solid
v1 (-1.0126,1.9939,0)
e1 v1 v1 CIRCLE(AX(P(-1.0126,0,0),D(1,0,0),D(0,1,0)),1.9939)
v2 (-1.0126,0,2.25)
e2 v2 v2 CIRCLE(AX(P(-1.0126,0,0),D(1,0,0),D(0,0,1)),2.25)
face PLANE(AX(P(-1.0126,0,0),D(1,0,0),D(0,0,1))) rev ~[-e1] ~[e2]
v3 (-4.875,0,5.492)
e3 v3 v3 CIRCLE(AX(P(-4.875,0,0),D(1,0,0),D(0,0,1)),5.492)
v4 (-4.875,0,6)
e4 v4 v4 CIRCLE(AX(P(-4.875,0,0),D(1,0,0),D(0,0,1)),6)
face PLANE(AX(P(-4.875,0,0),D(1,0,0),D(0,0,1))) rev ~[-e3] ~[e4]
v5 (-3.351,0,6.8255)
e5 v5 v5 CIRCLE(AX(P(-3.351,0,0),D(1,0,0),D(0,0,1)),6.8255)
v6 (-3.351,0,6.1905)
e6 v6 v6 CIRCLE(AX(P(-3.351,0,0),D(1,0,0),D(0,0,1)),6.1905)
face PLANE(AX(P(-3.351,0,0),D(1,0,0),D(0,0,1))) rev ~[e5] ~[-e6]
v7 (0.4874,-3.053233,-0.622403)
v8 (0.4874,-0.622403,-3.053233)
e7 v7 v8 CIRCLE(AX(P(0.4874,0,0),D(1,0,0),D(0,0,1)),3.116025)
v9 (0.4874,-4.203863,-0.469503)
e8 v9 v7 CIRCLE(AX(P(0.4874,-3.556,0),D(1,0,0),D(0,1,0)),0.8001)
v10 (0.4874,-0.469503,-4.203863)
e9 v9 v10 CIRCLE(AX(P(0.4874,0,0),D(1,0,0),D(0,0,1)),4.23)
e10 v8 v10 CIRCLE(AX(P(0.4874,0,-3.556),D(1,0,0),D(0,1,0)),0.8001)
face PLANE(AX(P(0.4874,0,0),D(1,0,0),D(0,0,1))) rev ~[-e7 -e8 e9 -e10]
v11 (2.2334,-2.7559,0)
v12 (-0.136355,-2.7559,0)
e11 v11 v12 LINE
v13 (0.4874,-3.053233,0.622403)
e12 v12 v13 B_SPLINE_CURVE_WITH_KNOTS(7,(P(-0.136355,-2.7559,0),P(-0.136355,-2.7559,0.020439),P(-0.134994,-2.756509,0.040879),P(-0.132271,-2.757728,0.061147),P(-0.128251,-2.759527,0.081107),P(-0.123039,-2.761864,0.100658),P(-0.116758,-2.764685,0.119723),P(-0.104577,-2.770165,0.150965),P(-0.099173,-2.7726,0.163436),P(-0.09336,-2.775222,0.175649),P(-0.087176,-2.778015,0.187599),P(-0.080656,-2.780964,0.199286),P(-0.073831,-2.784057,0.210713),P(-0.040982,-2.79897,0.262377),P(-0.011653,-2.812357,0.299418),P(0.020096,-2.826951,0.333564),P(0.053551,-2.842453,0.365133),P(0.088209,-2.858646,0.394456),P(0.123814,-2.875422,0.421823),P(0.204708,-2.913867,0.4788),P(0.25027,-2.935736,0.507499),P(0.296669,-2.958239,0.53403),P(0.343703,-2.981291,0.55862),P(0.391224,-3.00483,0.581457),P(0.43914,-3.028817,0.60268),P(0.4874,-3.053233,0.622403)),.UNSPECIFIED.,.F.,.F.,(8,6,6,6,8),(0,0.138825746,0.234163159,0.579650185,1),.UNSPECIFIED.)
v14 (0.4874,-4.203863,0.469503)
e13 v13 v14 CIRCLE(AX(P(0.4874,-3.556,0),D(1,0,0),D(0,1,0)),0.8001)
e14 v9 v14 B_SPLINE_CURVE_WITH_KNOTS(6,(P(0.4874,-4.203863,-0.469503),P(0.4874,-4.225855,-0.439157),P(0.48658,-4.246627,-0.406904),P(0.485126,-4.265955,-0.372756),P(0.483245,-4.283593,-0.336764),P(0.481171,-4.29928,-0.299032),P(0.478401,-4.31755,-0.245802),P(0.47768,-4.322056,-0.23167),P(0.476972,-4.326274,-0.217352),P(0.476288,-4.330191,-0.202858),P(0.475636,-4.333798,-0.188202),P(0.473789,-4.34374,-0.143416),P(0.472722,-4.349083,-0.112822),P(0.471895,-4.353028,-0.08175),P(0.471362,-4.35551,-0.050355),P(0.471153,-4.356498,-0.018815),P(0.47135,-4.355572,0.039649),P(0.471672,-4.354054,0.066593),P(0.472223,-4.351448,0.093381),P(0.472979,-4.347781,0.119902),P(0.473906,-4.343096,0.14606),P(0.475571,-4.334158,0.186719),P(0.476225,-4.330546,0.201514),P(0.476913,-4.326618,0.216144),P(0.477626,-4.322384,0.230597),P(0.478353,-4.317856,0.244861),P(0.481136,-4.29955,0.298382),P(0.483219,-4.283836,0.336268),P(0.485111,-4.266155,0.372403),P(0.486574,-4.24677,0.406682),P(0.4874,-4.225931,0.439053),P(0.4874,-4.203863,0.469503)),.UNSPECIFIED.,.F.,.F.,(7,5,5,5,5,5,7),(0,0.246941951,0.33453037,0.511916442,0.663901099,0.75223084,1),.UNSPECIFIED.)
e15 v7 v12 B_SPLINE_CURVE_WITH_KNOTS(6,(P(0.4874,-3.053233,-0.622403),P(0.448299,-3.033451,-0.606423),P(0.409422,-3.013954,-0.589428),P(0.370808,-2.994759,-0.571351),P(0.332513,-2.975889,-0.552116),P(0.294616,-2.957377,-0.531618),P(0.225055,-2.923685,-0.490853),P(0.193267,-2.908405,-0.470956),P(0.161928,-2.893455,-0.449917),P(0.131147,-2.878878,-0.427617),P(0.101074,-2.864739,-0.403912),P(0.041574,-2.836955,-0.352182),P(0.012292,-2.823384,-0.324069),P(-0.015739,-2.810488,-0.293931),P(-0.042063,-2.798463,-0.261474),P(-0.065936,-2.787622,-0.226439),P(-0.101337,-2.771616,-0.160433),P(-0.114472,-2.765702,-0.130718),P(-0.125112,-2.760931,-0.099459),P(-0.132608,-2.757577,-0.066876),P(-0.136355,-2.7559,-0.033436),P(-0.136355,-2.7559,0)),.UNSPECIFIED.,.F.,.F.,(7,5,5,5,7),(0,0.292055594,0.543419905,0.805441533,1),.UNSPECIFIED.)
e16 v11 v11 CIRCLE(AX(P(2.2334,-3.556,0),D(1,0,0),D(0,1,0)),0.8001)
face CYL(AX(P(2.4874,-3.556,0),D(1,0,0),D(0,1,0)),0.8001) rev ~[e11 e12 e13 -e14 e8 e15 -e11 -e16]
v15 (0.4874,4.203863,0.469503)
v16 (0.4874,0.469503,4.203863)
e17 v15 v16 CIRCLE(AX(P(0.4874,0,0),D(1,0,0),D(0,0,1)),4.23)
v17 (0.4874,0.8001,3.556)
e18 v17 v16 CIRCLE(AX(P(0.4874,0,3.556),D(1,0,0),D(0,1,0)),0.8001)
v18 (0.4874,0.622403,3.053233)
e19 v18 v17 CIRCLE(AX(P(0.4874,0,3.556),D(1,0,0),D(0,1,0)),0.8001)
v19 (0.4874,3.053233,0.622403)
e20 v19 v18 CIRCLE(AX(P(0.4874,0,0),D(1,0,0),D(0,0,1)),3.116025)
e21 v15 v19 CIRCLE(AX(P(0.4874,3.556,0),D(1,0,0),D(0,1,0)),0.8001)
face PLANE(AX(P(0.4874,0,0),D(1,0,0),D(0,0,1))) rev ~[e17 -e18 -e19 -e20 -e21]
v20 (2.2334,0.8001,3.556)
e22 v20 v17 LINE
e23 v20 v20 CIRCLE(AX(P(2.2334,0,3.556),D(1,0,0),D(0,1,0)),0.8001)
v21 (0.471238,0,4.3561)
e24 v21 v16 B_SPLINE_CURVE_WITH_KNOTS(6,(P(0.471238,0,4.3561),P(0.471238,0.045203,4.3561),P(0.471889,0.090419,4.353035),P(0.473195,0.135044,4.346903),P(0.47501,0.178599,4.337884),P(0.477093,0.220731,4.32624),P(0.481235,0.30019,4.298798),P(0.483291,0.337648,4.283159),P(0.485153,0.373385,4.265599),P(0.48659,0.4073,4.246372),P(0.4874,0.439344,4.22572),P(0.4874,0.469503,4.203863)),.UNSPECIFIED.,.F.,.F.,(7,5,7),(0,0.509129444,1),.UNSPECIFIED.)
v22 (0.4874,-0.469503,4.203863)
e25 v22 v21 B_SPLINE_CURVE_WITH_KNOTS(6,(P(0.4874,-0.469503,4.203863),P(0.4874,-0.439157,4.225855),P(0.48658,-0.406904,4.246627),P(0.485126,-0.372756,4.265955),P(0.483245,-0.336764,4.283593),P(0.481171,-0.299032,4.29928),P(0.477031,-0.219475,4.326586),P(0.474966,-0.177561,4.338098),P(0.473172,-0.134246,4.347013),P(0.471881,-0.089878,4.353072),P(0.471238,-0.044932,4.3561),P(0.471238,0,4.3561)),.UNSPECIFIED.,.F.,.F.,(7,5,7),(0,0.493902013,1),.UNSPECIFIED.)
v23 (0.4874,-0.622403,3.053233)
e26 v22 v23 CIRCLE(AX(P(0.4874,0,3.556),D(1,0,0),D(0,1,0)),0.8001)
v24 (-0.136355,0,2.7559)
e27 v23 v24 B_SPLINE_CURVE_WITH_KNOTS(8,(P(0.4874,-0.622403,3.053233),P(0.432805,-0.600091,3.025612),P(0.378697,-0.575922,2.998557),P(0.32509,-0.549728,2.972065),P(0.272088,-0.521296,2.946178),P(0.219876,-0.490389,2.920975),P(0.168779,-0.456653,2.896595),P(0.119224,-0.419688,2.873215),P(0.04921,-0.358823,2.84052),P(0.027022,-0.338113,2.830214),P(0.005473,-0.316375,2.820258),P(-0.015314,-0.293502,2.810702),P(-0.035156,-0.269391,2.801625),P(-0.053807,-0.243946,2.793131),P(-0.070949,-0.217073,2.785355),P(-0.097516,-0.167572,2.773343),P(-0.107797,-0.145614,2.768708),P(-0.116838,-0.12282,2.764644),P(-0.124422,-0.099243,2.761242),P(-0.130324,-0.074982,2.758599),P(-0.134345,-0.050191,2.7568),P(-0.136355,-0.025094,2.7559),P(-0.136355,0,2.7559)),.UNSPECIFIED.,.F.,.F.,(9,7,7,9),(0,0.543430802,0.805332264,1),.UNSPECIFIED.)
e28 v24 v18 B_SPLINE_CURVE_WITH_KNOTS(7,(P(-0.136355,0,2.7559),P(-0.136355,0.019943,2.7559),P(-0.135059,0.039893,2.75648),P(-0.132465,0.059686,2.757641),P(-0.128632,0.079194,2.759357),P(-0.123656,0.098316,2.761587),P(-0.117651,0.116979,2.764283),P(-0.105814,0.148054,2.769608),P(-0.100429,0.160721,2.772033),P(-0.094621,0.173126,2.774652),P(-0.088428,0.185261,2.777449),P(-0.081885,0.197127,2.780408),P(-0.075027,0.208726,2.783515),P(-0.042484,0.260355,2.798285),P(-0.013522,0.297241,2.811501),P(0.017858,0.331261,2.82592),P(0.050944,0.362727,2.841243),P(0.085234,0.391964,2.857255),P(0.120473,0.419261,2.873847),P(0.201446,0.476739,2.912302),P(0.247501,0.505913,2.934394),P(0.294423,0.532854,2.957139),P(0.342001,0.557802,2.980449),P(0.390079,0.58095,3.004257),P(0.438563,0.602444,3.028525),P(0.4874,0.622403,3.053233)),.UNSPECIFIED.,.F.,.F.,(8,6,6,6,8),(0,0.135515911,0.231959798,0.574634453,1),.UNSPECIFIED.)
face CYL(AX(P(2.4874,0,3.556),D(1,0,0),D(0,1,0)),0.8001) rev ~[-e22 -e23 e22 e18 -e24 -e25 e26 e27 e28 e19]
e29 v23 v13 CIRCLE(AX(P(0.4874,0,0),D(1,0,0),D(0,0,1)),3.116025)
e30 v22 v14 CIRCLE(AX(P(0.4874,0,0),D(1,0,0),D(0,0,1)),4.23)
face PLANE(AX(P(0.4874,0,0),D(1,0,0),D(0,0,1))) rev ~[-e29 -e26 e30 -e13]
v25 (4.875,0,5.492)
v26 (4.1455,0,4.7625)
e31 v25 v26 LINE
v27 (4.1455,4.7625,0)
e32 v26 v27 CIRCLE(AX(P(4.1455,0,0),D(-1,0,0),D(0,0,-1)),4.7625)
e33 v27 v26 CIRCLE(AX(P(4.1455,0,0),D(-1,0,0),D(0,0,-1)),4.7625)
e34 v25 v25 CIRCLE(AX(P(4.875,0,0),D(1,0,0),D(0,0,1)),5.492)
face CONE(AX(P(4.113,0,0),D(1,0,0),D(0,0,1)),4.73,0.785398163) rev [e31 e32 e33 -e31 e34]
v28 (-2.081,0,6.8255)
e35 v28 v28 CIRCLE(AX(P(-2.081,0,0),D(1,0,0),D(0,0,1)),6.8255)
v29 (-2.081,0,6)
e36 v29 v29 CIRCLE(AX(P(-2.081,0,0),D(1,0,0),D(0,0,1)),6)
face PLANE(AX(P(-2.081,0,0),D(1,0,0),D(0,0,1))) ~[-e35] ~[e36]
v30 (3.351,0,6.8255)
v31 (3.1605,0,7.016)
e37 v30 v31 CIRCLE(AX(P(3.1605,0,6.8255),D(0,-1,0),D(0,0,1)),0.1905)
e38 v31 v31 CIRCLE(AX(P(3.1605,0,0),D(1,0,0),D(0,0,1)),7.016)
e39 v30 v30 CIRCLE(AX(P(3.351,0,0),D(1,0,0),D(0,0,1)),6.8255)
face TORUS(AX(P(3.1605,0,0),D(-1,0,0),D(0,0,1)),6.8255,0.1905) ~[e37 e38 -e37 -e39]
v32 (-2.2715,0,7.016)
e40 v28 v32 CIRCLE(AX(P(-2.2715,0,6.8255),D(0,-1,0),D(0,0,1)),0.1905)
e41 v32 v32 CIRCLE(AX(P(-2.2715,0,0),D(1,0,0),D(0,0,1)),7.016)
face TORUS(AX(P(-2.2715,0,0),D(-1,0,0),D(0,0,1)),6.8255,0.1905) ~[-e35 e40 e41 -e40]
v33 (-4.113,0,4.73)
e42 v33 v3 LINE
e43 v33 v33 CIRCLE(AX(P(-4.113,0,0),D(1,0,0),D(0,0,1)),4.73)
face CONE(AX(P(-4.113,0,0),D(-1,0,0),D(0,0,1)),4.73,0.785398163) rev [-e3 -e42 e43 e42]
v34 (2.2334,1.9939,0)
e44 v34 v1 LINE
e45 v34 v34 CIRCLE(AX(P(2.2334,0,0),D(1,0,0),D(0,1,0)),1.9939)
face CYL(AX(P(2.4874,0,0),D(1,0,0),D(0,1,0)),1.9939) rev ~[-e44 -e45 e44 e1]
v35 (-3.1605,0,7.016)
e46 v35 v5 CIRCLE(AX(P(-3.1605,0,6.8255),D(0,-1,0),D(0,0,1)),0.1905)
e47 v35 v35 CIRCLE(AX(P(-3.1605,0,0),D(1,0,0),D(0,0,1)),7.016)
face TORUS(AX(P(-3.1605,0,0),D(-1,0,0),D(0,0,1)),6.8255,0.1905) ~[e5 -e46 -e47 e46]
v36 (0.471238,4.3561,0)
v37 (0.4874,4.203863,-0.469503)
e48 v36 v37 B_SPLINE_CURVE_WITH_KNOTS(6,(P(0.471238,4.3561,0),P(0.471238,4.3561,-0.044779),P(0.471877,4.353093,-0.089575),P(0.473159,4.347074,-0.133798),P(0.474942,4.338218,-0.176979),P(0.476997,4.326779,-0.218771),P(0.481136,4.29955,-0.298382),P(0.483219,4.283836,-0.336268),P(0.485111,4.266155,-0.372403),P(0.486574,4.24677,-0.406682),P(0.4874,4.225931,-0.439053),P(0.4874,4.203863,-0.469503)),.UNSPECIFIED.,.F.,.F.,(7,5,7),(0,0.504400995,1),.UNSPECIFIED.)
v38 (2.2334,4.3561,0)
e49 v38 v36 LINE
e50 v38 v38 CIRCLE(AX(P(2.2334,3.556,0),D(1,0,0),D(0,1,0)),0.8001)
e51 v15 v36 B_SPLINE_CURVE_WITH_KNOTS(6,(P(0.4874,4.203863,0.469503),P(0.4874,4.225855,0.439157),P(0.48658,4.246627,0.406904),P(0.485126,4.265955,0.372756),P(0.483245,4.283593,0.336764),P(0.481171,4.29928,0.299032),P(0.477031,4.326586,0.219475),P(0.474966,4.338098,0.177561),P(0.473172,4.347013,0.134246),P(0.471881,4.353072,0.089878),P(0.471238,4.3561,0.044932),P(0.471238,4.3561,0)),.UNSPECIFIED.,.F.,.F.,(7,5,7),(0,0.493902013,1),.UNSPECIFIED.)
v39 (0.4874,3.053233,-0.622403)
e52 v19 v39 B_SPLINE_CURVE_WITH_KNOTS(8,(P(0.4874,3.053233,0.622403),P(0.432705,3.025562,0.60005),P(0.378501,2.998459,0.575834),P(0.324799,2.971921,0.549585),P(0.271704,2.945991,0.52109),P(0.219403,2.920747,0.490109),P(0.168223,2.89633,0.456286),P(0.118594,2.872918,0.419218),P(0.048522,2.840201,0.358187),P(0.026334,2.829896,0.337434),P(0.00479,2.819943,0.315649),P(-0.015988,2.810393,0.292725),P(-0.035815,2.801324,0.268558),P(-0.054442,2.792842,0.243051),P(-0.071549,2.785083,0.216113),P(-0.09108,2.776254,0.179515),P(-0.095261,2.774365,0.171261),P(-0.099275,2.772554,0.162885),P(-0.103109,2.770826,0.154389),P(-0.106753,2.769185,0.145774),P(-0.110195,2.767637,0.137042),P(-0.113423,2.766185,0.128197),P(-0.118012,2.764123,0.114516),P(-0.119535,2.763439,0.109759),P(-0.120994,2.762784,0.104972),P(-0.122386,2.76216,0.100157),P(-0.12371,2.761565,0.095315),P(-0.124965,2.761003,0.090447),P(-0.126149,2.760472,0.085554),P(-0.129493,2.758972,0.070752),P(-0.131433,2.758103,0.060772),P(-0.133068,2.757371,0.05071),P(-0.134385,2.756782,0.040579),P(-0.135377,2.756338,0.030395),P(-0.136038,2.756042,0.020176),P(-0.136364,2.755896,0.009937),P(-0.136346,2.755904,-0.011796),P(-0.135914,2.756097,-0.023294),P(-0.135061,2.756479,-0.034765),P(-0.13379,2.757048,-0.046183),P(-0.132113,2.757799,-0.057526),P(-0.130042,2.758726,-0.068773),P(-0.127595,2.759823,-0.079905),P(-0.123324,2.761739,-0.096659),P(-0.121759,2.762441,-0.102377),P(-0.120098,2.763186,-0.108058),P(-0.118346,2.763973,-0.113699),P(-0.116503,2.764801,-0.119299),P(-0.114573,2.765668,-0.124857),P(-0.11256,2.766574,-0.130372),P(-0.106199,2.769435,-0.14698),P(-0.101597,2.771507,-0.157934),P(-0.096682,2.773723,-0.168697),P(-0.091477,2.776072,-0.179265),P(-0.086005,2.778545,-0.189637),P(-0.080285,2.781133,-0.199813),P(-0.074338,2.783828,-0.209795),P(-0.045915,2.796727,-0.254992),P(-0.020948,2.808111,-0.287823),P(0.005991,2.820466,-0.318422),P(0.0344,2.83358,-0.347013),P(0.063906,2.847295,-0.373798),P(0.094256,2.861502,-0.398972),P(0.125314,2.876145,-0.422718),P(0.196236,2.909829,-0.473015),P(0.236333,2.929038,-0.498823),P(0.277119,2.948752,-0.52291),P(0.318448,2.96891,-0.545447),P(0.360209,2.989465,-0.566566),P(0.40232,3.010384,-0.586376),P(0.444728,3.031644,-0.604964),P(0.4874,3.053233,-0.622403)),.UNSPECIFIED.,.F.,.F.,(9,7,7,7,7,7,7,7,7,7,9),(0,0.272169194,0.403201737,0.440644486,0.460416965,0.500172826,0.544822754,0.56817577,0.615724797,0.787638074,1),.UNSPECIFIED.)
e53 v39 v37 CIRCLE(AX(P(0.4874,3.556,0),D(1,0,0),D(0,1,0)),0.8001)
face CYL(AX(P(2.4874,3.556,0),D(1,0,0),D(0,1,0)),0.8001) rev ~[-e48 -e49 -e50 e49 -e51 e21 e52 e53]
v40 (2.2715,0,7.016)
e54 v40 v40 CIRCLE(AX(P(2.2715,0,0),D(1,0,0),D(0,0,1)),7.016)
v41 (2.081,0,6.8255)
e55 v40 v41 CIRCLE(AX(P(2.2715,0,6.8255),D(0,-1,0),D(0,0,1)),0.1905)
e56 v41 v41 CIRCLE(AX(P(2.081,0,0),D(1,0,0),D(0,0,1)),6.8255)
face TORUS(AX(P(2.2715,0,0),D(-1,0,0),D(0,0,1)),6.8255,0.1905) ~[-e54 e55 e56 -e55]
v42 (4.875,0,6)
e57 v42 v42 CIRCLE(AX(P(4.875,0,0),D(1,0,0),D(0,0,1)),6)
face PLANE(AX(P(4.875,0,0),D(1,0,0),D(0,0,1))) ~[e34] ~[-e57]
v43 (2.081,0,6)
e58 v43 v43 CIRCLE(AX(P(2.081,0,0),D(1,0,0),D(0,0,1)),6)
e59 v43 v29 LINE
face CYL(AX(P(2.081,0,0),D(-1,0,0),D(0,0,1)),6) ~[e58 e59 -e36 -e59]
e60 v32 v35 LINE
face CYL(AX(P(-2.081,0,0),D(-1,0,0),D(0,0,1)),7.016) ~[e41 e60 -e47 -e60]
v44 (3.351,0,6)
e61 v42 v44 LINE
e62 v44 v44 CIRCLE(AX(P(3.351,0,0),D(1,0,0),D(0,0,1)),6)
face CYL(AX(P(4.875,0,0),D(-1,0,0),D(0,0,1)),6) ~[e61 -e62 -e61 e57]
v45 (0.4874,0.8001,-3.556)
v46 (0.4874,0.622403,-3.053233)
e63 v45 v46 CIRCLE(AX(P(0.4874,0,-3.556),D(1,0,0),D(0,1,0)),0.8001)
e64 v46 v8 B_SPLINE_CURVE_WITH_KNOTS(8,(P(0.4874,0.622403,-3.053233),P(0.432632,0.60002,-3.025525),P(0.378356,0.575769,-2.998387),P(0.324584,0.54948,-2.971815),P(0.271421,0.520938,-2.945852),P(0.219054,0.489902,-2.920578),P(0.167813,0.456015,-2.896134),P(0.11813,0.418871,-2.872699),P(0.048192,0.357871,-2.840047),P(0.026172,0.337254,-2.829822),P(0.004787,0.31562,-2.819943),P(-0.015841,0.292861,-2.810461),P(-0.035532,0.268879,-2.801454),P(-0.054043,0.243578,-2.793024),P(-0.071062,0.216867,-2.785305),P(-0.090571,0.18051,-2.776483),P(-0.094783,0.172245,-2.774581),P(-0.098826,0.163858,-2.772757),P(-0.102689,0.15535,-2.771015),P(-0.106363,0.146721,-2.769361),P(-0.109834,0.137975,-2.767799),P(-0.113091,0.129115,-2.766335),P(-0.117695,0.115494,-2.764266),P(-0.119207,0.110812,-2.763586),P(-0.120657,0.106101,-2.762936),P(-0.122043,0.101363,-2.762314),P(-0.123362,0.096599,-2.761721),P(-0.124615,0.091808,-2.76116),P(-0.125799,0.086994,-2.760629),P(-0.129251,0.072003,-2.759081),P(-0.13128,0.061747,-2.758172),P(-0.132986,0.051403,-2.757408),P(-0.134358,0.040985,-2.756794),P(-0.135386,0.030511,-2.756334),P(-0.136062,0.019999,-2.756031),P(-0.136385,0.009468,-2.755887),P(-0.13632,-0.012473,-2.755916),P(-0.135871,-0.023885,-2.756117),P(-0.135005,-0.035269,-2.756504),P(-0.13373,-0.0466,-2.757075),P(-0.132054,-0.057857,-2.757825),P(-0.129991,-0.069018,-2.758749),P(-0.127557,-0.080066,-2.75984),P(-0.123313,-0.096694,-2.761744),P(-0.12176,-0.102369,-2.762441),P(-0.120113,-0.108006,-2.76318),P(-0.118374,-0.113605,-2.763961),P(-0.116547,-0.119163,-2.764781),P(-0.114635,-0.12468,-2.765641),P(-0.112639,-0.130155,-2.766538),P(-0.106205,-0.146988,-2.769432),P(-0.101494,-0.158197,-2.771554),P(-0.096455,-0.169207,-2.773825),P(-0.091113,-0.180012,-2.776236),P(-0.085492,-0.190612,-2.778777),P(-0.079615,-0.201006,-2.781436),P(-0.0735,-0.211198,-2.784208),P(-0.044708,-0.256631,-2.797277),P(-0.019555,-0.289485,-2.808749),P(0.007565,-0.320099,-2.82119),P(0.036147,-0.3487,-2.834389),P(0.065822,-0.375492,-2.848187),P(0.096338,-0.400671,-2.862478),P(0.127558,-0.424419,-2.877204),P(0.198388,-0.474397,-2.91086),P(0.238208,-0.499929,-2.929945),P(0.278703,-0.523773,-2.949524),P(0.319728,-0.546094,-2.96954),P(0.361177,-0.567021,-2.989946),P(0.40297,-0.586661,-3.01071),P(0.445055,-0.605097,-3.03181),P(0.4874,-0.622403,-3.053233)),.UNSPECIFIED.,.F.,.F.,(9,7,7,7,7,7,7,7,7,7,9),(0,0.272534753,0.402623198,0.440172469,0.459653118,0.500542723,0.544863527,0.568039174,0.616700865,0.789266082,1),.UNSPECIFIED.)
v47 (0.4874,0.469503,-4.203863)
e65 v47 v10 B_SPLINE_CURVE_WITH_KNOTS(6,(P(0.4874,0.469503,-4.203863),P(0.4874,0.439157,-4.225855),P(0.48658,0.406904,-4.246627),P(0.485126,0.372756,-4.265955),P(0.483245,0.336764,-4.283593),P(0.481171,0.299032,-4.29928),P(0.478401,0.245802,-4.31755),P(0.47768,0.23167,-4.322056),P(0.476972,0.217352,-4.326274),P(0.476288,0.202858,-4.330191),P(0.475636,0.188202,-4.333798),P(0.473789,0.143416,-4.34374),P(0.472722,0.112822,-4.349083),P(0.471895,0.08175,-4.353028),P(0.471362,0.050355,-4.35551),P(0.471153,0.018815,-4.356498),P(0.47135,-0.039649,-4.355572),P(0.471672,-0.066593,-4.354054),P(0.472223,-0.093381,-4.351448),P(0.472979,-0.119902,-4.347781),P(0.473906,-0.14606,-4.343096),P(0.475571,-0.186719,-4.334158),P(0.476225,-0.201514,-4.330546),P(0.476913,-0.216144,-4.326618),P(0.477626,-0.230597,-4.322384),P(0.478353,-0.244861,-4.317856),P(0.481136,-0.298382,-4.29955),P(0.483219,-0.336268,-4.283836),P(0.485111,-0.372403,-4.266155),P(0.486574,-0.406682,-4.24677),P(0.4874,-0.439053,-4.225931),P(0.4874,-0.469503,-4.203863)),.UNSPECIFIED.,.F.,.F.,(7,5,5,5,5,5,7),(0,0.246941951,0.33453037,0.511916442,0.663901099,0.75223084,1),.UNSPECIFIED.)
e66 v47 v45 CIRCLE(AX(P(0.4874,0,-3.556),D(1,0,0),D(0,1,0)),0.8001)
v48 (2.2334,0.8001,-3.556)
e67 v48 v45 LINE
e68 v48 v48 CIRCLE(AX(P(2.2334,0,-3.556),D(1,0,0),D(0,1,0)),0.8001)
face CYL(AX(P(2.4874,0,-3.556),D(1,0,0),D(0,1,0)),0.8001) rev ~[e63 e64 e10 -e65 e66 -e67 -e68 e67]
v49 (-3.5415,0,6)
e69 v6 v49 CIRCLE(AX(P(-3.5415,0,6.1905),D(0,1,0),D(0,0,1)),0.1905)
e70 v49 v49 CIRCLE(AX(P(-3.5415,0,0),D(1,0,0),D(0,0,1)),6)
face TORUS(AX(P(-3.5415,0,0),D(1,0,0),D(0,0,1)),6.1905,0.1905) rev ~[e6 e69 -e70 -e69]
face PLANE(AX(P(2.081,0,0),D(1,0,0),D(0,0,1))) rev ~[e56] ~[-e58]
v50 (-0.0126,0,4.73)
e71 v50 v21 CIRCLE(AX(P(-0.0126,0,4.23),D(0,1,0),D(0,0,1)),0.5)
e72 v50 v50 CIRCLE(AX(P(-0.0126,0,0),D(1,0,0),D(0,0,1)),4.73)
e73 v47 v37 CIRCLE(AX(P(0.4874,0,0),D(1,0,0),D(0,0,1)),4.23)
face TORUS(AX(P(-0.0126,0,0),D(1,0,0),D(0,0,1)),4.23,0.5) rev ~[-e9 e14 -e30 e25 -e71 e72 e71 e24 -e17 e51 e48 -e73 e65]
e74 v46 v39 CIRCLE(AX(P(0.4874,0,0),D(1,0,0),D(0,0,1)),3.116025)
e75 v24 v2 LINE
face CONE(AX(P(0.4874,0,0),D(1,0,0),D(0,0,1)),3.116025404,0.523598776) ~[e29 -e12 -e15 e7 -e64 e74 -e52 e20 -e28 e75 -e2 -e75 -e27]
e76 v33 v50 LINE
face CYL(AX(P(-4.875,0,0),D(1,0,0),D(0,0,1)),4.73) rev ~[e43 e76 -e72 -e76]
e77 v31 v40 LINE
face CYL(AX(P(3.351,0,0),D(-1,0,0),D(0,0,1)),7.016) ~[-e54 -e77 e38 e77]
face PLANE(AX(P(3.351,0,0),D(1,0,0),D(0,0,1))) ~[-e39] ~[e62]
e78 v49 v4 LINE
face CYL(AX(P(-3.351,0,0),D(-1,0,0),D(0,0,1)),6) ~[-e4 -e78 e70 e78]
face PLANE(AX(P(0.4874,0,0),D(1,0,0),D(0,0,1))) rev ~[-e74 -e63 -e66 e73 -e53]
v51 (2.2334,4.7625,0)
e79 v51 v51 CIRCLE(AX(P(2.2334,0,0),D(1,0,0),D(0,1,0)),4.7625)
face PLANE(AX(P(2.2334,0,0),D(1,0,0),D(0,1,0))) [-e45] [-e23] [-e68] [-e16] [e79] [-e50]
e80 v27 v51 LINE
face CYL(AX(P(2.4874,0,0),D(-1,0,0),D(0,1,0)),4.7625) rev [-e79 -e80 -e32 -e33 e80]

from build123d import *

# Parameters (mm, degrees)
F2_R          = 0.1905
F3_SIZE       = 0.762
F4_R          = 0.8001
F4_R_2        = 1.9939
F5_DEPTH      = 7.3634
F6_R          = 4.7625
F7_DEPTH      = 0.254
F7_DEPTH_BACK = 2.3886


with BuildPart() as f1:
    # F0 (on Front) → F1 (revolve)
    with BuildSketch(Plane.XZ):
        with BuildLine():
            Line((-1.0126, 2.25), (-1.0126, 1))
            Line((-1.0126, 1), (2.4874, 1))
            Line((2.4874, 1), (2.4874, 4.23))
            Line((2.4874, 4.23), (2.9874, 4.73))
            Line((2.9874, 4.73), (4.875, 4.73))
            Line((4.875, 4.73), (4.875, 6))
            Line((4.875, 6), (3.351, 6))
            Line((3.351, 6), (3.351, 7.016))
            Line((3.351, 7.016), (2.081, 7.016))
            Line((2.081, 7.016), (2.081, 6))
            Line((2.081, 6), (-2.081, 6))
            Line((-2.081, 6), (-2.081, 7.016))
            Line((-2.081, 7.016), (-3.351, 7.016))
            Line((-3.351, 7.016), (-3.351, 6))
            Line((-3.351, 6), (-4.875, 6))
            Line((-4.875, 6), (-4.875, 4.73))
            Line((-4.875, 4.73), (-0.0126, 4.73))
            ThreePointArc((-0.0126, 4.73), (0.3409533906, 4.5835533906), (0.4874, 4.23))
            Line((0.4874, 4.23), (0.4874, 3.1160254038))
            Line((0.4874, 3.1160254038), (-1.0126, 2.25))
        make_face()
    revolve(axis=Axis((17.3129402101, 0, 0), (1, 0, 0)))

    # F2
    f2_edges = [f1.edges().sort_by_distance(p)[0] for p in [
        (3.351, 0, -7.016),
        (-2.081, 0, -7.016),
        (2.081, 0, -7.016),
        (-3.351, 0, -7.016),
        (-3.351, 0, -6),
    ]]
    fillet(f2_edges, radius=F2_R)

    # F3
    f3_edges = [f1.edges().sort_by_distance(p)[0] for p in [
        (4.875, 0, -4.73),
        (-4.875, 0, -4.73),
    ]]
    chamfer(f3_edges, length=F3_SIZE)

    # F4 (on face) → F5 (cut, through all)
    with BuildSketch(Plane.YZ.offset(2.4874)):
        with Locations((0, 3.556)):
            Circle(F4_R)
        with Locations((0, -3.556)):
            Circle(F4_R)
        with Locations((-3.556, 0)):
            Circle(F4_R)
        with Locations((3.556, 0)):
            Circle(F4_R)
        Circle(F4_R_2)
    extrude(amount=-F5_DEPTH, mode=Mode.SUBTRACT)

    # F6 (on face) → F7 (cut, two sides)
    with BuildSketch(Plane.YZ.offset(2.4874)) as f7_sk:
        Circle(F6_R)
    extrude(amount=-F7_DEPTH, mode=Mode.SUBTRACT)
    extrude(f7_sk.sketch, amount=F7_DEPTH_BACK, mode=Mode.SUBTRACT)


solid = f1.part
